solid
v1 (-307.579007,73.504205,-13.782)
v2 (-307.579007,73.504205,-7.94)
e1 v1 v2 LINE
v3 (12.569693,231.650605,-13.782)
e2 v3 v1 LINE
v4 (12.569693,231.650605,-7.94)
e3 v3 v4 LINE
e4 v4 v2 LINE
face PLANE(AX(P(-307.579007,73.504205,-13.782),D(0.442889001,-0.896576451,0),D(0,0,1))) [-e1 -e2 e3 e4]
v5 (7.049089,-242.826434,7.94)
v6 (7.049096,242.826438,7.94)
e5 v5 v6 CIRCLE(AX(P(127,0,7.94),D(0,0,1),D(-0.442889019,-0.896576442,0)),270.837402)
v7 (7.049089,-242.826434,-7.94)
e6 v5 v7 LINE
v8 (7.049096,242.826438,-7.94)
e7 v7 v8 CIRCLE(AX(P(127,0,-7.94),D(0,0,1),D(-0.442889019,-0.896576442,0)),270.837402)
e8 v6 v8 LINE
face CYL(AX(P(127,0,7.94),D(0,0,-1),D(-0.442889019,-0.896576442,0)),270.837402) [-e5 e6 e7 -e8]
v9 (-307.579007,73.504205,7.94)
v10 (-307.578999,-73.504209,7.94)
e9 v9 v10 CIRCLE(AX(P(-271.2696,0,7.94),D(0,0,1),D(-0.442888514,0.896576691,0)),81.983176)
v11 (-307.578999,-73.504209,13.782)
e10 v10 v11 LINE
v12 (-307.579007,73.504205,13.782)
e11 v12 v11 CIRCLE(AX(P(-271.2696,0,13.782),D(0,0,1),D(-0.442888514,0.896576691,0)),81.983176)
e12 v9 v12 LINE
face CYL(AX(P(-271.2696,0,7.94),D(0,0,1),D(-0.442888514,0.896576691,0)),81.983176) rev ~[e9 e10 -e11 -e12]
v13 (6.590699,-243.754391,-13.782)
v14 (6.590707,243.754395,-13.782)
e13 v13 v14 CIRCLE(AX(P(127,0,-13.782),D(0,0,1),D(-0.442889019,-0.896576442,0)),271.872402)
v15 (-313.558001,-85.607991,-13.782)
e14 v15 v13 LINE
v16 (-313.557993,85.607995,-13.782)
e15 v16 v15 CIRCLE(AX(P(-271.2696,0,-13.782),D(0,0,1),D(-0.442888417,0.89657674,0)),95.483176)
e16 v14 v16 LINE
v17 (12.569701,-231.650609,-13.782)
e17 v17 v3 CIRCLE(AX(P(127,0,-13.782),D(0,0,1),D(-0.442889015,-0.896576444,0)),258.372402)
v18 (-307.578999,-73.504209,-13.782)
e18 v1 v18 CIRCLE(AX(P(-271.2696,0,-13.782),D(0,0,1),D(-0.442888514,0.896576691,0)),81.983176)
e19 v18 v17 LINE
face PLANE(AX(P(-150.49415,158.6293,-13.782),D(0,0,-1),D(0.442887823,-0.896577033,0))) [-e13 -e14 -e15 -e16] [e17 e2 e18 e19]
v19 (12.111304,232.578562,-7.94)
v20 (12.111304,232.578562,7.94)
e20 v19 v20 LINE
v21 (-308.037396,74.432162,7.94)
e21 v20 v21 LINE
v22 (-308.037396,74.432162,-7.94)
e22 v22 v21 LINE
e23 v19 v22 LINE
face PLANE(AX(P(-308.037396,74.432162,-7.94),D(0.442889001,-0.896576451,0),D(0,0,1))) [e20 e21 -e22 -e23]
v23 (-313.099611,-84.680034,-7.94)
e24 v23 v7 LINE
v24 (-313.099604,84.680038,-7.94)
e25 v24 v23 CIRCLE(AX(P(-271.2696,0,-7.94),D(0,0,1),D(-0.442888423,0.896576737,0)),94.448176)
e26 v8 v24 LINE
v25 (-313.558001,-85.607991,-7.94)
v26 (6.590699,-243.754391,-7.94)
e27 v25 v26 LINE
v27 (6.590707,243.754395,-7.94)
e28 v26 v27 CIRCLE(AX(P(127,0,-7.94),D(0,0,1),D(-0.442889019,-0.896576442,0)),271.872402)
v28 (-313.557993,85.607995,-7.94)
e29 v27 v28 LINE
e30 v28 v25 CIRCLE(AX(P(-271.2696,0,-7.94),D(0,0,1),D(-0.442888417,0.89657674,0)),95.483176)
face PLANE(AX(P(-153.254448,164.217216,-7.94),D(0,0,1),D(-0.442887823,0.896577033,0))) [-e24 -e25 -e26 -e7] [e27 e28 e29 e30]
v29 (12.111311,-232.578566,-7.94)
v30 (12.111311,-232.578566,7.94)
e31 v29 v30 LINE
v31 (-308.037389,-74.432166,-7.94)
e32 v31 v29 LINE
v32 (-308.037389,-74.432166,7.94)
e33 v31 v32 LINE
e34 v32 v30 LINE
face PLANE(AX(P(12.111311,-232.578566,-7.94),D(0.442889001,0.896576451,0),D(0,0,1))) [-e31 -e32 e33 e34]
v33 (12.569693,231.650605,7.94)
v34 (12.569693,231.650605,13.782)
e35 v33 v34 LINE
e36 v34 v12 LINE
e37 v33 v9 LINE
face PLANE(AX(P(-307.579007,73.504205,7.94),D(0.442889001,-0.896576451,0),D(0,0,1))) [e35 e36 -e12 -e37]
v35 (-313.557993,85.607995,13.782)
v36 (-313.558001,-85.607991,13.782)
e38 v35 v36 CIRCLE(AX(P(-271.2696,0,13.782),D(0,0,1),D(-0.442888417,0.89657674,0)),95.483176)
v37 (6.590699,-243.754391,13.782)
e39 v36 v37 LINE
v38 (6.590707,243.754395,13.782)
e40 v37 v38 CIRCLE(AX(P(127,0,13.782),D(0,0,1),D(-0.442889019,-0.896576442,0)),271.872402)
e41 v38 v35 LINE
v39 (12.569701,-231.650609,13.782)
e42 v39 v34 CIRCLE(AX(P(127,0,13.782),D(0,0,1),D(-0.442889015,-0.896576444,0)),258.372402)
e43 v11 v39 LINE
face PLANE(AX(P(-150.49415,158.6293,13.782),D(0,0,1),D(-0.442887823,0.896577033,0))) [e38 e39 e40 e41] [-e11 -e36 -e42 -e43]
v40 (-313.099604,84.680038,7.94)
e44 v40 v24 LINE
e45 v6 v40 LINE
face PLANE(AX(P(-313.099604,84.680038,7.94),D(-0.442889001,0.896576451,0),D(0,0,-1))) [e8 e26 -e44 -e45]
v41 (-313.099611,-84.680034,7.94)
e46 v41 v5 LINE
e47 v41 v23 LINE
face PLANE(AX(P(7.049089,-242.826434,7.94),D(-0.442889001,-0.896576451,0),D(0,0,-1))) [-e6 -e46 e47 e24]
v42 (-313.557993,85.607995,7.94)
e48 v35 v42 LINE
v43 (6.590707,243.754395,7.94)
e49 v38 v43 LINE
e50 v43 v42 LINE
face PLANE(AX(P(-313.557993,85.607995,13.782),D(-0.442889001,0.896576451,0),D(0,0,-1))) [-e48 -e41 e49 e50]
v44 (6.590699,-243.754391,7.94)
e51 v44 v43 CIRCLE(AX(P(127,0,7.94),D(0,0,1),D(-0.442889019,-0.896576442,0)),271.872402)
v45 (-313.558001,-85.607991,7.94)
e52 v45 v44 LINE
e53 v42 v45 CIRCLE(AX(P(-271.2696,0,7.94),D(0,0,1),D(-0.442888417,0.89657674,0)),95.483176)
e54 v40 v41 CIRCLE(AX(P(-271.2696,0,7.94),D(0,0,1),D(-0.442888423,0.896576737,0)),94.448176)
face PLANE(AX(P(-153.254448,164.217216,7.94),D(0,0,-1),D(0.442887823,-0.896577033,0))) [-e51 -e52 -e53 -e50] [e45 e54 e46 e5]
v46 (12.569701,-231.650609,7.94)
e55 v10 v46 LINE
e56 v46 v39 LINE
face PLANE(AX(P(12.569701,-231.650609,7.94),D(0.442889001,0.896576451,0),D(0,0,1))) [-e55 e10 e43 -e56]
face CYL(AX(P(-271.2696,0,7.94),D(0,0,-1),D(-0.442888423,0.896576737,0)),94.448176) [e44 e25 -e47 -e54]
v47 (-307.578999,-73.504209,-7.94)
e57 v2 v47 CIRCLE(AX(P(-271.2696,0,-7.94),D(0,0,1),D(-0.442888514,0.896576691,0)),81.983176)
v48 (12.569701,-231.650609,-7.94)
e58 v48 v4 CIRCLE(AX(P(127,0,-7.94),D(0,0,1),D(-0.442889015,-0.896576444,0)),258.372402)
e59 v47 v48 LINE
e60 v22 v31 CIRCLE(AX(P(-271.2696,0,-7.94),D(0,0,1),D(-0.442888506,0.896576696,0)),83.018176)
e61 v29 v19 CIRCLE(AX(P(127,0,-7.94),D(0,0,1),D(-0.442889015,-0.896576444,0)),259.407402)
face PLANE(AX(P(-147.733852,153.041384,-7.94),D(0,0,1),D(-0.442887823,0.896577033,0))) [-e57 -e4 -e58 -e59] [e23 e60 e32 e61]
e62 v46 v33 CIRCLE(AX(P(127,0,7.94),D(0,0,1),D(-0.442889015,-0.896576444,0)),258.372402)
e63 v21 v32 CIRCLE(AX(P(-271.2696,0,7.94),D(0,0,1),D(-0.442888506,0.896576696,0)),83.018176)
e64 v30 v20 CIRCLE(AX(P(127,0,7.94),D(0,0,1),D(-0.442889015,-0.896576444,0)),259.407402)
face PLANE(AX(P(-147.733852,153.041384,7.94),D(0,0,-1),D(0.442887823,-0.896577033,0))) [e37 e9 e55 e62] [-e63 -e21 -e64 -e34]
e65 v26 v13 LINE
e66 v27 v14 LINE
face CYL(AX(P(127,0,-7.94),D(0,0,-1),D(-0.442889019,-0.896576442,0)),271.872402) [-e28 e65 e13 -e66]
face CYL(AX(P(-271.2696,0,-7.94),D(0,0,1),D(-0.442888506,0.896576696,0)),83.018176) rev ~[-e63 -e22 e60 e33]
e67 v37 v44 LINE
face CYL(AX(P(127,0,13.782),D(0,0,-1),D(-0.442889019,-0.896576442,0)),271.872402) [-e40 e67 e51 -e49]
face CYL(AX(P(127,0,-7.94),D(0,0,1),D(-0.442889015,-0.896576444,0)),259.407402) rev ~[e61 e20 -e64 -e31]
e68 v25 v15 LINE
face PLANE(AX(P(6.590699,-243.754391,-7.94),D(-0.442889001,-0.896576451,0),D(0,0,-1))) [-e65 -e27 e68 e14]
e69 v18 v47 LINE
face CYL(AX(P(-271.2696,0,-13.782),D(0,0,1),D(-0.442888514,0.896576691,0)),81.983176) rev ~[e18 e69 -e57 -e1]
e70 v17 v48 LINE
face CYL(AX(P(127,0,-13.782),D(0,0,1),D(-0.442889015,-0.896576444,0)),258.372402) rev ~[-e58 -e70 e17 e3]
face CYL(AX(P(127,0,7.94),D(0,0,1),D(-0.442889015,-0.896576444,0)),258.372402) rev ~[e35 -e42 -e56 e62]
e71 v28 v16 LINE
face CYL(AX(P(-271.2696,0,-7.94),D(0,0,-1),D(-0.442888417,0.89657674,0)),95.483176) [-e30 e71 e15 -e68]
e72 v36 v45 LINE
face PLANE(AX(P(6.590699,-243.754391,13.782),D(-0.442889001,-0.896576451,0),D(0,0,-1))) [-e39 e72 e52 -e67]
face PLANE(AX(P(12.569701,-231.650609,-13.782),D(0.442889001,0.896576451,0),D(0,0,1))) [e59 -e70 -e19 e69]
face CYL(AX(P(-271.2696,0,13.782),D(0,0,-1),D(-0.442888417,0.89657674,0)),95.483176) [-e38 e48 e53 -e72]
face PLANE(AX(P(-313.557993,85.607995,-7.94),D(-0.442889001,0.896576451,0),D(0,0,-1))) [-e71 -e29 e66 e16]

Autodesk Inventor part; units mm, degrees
ref_plane "Work Plane2" through (-271.2696, 0, 0) normal (-1, 0, 0) x (0, 0, 1)
ref_plane "Work Plane3" through (127, 0, 0) normal (-0.9043554, -0.4267802, 0) x (0, 0, 1)
sketch "Path" plane through (0, 0, 0) normal (0, 0, 1) x (1, 0, 0)
  arc A0 (-310.5685, 79.5561) -> (-310.5685, -79.5561) centre (-271.2696, 0) ccw
  arc A1 (9.5802, -237.7025) -> (9.5802, 237.7025) centre (127, 0) ccw
  line L0 (9.5802, -237.7025) -> (-310.5685, -79.5561)
  line L1 (-310.5685, 79.5561) -> (9.5802, 237.7025)
  dimension "d31" = 13.5
ref_plane "Section Plane" through (-310.5685, -79.5561, 0) normal (0.8965764, -0.4428891, 0) x (0, 0, 1)
sketch "Section Sketch" plane through (-310.5685, -79.5561, 0) normal (0.8965764, -0.4428891, 0) x (0, 0, 1)
  line L0 (-13.35, -2.235) -> (13.35, -2.235)
  line L1 (13.35, -2.235) -> (13.35, 2.235)
  line L2 (13.35, 2.235) -> (-13.35, 2.235)
  line L3 (-13.35, 2.235) -> (-13.35, -2.235)
  line L4 (-7.94, -5.715) -> (7.94, -5.715)
  line L5 (7.94, -5.715) -> (7.94, 5.715)
  line L6 (7.94, 5.715) -> (-7.94, 5.715)
  line L7 (-7.94, 5.715) -> (-7.94, -5.715)
  line L8 (-7.94, 0) -> (7.94, 0) construction
  line L9 (-13.782, -6.75) -> (-7.94, -6.75)
  line L10 (-7.94, -6.75) -> (-7.94, 6.75)
  line L11 (-7.94, 6.75) -> (-13.782, 6.75)
  line L12 (-13.782, 6.75) -> (-13.782, -6.75)
  line L13 (7.94, -6.75) -> (13.782, -6.75)
  line L14 (13.782, -6.75) -> (13.782, 6.75)
  line L15 (13.782, 6.75) -> (7.94, 6.75)
  line L16 (7.94, 6.75) -> (7.94, -6.75)
  line L17 (-13.35, 0) -> (13.35, 0) construction
  point P0 (0, 0)
  point P1 (0, 0)
  dimension "d21" = 4.47
  dimension "d22" = 11.43
  dimension "d23" = 15.88
  dimension "d24" = 5.842
  dimension "d31" = 13.5
  dimension "d32" = 26.7
sweep "Solid" add profiles "Section Sketch" path "Path"
pattern_of_one "Strand Pattern"
equation "\"d21\" = da_d2"
equation "\"d22\" = da_d1"
equation "\"d23\" = da_b1"
equation "\"d24\" = da_t1 + da_t2"
equation "\"d30\" = da_pt"
equation "\"da_p\" = 29.21"
equation "\"da_b1\" = 15.88"
equation "\"da_h2\" = 13.5"
equation "\"da_h3\" = 13.5"
equation "\"da_d1\" = 11.43"
equation "\"da_d2\" = 4.47"
equation "\"da_pt\" = 25"
equation "\"da_b\" = 26.7"
equation "\"da_t1\" = 2.921"
equation "\"da_t2\" = 2.921"
properties part number "Roller Chain"
